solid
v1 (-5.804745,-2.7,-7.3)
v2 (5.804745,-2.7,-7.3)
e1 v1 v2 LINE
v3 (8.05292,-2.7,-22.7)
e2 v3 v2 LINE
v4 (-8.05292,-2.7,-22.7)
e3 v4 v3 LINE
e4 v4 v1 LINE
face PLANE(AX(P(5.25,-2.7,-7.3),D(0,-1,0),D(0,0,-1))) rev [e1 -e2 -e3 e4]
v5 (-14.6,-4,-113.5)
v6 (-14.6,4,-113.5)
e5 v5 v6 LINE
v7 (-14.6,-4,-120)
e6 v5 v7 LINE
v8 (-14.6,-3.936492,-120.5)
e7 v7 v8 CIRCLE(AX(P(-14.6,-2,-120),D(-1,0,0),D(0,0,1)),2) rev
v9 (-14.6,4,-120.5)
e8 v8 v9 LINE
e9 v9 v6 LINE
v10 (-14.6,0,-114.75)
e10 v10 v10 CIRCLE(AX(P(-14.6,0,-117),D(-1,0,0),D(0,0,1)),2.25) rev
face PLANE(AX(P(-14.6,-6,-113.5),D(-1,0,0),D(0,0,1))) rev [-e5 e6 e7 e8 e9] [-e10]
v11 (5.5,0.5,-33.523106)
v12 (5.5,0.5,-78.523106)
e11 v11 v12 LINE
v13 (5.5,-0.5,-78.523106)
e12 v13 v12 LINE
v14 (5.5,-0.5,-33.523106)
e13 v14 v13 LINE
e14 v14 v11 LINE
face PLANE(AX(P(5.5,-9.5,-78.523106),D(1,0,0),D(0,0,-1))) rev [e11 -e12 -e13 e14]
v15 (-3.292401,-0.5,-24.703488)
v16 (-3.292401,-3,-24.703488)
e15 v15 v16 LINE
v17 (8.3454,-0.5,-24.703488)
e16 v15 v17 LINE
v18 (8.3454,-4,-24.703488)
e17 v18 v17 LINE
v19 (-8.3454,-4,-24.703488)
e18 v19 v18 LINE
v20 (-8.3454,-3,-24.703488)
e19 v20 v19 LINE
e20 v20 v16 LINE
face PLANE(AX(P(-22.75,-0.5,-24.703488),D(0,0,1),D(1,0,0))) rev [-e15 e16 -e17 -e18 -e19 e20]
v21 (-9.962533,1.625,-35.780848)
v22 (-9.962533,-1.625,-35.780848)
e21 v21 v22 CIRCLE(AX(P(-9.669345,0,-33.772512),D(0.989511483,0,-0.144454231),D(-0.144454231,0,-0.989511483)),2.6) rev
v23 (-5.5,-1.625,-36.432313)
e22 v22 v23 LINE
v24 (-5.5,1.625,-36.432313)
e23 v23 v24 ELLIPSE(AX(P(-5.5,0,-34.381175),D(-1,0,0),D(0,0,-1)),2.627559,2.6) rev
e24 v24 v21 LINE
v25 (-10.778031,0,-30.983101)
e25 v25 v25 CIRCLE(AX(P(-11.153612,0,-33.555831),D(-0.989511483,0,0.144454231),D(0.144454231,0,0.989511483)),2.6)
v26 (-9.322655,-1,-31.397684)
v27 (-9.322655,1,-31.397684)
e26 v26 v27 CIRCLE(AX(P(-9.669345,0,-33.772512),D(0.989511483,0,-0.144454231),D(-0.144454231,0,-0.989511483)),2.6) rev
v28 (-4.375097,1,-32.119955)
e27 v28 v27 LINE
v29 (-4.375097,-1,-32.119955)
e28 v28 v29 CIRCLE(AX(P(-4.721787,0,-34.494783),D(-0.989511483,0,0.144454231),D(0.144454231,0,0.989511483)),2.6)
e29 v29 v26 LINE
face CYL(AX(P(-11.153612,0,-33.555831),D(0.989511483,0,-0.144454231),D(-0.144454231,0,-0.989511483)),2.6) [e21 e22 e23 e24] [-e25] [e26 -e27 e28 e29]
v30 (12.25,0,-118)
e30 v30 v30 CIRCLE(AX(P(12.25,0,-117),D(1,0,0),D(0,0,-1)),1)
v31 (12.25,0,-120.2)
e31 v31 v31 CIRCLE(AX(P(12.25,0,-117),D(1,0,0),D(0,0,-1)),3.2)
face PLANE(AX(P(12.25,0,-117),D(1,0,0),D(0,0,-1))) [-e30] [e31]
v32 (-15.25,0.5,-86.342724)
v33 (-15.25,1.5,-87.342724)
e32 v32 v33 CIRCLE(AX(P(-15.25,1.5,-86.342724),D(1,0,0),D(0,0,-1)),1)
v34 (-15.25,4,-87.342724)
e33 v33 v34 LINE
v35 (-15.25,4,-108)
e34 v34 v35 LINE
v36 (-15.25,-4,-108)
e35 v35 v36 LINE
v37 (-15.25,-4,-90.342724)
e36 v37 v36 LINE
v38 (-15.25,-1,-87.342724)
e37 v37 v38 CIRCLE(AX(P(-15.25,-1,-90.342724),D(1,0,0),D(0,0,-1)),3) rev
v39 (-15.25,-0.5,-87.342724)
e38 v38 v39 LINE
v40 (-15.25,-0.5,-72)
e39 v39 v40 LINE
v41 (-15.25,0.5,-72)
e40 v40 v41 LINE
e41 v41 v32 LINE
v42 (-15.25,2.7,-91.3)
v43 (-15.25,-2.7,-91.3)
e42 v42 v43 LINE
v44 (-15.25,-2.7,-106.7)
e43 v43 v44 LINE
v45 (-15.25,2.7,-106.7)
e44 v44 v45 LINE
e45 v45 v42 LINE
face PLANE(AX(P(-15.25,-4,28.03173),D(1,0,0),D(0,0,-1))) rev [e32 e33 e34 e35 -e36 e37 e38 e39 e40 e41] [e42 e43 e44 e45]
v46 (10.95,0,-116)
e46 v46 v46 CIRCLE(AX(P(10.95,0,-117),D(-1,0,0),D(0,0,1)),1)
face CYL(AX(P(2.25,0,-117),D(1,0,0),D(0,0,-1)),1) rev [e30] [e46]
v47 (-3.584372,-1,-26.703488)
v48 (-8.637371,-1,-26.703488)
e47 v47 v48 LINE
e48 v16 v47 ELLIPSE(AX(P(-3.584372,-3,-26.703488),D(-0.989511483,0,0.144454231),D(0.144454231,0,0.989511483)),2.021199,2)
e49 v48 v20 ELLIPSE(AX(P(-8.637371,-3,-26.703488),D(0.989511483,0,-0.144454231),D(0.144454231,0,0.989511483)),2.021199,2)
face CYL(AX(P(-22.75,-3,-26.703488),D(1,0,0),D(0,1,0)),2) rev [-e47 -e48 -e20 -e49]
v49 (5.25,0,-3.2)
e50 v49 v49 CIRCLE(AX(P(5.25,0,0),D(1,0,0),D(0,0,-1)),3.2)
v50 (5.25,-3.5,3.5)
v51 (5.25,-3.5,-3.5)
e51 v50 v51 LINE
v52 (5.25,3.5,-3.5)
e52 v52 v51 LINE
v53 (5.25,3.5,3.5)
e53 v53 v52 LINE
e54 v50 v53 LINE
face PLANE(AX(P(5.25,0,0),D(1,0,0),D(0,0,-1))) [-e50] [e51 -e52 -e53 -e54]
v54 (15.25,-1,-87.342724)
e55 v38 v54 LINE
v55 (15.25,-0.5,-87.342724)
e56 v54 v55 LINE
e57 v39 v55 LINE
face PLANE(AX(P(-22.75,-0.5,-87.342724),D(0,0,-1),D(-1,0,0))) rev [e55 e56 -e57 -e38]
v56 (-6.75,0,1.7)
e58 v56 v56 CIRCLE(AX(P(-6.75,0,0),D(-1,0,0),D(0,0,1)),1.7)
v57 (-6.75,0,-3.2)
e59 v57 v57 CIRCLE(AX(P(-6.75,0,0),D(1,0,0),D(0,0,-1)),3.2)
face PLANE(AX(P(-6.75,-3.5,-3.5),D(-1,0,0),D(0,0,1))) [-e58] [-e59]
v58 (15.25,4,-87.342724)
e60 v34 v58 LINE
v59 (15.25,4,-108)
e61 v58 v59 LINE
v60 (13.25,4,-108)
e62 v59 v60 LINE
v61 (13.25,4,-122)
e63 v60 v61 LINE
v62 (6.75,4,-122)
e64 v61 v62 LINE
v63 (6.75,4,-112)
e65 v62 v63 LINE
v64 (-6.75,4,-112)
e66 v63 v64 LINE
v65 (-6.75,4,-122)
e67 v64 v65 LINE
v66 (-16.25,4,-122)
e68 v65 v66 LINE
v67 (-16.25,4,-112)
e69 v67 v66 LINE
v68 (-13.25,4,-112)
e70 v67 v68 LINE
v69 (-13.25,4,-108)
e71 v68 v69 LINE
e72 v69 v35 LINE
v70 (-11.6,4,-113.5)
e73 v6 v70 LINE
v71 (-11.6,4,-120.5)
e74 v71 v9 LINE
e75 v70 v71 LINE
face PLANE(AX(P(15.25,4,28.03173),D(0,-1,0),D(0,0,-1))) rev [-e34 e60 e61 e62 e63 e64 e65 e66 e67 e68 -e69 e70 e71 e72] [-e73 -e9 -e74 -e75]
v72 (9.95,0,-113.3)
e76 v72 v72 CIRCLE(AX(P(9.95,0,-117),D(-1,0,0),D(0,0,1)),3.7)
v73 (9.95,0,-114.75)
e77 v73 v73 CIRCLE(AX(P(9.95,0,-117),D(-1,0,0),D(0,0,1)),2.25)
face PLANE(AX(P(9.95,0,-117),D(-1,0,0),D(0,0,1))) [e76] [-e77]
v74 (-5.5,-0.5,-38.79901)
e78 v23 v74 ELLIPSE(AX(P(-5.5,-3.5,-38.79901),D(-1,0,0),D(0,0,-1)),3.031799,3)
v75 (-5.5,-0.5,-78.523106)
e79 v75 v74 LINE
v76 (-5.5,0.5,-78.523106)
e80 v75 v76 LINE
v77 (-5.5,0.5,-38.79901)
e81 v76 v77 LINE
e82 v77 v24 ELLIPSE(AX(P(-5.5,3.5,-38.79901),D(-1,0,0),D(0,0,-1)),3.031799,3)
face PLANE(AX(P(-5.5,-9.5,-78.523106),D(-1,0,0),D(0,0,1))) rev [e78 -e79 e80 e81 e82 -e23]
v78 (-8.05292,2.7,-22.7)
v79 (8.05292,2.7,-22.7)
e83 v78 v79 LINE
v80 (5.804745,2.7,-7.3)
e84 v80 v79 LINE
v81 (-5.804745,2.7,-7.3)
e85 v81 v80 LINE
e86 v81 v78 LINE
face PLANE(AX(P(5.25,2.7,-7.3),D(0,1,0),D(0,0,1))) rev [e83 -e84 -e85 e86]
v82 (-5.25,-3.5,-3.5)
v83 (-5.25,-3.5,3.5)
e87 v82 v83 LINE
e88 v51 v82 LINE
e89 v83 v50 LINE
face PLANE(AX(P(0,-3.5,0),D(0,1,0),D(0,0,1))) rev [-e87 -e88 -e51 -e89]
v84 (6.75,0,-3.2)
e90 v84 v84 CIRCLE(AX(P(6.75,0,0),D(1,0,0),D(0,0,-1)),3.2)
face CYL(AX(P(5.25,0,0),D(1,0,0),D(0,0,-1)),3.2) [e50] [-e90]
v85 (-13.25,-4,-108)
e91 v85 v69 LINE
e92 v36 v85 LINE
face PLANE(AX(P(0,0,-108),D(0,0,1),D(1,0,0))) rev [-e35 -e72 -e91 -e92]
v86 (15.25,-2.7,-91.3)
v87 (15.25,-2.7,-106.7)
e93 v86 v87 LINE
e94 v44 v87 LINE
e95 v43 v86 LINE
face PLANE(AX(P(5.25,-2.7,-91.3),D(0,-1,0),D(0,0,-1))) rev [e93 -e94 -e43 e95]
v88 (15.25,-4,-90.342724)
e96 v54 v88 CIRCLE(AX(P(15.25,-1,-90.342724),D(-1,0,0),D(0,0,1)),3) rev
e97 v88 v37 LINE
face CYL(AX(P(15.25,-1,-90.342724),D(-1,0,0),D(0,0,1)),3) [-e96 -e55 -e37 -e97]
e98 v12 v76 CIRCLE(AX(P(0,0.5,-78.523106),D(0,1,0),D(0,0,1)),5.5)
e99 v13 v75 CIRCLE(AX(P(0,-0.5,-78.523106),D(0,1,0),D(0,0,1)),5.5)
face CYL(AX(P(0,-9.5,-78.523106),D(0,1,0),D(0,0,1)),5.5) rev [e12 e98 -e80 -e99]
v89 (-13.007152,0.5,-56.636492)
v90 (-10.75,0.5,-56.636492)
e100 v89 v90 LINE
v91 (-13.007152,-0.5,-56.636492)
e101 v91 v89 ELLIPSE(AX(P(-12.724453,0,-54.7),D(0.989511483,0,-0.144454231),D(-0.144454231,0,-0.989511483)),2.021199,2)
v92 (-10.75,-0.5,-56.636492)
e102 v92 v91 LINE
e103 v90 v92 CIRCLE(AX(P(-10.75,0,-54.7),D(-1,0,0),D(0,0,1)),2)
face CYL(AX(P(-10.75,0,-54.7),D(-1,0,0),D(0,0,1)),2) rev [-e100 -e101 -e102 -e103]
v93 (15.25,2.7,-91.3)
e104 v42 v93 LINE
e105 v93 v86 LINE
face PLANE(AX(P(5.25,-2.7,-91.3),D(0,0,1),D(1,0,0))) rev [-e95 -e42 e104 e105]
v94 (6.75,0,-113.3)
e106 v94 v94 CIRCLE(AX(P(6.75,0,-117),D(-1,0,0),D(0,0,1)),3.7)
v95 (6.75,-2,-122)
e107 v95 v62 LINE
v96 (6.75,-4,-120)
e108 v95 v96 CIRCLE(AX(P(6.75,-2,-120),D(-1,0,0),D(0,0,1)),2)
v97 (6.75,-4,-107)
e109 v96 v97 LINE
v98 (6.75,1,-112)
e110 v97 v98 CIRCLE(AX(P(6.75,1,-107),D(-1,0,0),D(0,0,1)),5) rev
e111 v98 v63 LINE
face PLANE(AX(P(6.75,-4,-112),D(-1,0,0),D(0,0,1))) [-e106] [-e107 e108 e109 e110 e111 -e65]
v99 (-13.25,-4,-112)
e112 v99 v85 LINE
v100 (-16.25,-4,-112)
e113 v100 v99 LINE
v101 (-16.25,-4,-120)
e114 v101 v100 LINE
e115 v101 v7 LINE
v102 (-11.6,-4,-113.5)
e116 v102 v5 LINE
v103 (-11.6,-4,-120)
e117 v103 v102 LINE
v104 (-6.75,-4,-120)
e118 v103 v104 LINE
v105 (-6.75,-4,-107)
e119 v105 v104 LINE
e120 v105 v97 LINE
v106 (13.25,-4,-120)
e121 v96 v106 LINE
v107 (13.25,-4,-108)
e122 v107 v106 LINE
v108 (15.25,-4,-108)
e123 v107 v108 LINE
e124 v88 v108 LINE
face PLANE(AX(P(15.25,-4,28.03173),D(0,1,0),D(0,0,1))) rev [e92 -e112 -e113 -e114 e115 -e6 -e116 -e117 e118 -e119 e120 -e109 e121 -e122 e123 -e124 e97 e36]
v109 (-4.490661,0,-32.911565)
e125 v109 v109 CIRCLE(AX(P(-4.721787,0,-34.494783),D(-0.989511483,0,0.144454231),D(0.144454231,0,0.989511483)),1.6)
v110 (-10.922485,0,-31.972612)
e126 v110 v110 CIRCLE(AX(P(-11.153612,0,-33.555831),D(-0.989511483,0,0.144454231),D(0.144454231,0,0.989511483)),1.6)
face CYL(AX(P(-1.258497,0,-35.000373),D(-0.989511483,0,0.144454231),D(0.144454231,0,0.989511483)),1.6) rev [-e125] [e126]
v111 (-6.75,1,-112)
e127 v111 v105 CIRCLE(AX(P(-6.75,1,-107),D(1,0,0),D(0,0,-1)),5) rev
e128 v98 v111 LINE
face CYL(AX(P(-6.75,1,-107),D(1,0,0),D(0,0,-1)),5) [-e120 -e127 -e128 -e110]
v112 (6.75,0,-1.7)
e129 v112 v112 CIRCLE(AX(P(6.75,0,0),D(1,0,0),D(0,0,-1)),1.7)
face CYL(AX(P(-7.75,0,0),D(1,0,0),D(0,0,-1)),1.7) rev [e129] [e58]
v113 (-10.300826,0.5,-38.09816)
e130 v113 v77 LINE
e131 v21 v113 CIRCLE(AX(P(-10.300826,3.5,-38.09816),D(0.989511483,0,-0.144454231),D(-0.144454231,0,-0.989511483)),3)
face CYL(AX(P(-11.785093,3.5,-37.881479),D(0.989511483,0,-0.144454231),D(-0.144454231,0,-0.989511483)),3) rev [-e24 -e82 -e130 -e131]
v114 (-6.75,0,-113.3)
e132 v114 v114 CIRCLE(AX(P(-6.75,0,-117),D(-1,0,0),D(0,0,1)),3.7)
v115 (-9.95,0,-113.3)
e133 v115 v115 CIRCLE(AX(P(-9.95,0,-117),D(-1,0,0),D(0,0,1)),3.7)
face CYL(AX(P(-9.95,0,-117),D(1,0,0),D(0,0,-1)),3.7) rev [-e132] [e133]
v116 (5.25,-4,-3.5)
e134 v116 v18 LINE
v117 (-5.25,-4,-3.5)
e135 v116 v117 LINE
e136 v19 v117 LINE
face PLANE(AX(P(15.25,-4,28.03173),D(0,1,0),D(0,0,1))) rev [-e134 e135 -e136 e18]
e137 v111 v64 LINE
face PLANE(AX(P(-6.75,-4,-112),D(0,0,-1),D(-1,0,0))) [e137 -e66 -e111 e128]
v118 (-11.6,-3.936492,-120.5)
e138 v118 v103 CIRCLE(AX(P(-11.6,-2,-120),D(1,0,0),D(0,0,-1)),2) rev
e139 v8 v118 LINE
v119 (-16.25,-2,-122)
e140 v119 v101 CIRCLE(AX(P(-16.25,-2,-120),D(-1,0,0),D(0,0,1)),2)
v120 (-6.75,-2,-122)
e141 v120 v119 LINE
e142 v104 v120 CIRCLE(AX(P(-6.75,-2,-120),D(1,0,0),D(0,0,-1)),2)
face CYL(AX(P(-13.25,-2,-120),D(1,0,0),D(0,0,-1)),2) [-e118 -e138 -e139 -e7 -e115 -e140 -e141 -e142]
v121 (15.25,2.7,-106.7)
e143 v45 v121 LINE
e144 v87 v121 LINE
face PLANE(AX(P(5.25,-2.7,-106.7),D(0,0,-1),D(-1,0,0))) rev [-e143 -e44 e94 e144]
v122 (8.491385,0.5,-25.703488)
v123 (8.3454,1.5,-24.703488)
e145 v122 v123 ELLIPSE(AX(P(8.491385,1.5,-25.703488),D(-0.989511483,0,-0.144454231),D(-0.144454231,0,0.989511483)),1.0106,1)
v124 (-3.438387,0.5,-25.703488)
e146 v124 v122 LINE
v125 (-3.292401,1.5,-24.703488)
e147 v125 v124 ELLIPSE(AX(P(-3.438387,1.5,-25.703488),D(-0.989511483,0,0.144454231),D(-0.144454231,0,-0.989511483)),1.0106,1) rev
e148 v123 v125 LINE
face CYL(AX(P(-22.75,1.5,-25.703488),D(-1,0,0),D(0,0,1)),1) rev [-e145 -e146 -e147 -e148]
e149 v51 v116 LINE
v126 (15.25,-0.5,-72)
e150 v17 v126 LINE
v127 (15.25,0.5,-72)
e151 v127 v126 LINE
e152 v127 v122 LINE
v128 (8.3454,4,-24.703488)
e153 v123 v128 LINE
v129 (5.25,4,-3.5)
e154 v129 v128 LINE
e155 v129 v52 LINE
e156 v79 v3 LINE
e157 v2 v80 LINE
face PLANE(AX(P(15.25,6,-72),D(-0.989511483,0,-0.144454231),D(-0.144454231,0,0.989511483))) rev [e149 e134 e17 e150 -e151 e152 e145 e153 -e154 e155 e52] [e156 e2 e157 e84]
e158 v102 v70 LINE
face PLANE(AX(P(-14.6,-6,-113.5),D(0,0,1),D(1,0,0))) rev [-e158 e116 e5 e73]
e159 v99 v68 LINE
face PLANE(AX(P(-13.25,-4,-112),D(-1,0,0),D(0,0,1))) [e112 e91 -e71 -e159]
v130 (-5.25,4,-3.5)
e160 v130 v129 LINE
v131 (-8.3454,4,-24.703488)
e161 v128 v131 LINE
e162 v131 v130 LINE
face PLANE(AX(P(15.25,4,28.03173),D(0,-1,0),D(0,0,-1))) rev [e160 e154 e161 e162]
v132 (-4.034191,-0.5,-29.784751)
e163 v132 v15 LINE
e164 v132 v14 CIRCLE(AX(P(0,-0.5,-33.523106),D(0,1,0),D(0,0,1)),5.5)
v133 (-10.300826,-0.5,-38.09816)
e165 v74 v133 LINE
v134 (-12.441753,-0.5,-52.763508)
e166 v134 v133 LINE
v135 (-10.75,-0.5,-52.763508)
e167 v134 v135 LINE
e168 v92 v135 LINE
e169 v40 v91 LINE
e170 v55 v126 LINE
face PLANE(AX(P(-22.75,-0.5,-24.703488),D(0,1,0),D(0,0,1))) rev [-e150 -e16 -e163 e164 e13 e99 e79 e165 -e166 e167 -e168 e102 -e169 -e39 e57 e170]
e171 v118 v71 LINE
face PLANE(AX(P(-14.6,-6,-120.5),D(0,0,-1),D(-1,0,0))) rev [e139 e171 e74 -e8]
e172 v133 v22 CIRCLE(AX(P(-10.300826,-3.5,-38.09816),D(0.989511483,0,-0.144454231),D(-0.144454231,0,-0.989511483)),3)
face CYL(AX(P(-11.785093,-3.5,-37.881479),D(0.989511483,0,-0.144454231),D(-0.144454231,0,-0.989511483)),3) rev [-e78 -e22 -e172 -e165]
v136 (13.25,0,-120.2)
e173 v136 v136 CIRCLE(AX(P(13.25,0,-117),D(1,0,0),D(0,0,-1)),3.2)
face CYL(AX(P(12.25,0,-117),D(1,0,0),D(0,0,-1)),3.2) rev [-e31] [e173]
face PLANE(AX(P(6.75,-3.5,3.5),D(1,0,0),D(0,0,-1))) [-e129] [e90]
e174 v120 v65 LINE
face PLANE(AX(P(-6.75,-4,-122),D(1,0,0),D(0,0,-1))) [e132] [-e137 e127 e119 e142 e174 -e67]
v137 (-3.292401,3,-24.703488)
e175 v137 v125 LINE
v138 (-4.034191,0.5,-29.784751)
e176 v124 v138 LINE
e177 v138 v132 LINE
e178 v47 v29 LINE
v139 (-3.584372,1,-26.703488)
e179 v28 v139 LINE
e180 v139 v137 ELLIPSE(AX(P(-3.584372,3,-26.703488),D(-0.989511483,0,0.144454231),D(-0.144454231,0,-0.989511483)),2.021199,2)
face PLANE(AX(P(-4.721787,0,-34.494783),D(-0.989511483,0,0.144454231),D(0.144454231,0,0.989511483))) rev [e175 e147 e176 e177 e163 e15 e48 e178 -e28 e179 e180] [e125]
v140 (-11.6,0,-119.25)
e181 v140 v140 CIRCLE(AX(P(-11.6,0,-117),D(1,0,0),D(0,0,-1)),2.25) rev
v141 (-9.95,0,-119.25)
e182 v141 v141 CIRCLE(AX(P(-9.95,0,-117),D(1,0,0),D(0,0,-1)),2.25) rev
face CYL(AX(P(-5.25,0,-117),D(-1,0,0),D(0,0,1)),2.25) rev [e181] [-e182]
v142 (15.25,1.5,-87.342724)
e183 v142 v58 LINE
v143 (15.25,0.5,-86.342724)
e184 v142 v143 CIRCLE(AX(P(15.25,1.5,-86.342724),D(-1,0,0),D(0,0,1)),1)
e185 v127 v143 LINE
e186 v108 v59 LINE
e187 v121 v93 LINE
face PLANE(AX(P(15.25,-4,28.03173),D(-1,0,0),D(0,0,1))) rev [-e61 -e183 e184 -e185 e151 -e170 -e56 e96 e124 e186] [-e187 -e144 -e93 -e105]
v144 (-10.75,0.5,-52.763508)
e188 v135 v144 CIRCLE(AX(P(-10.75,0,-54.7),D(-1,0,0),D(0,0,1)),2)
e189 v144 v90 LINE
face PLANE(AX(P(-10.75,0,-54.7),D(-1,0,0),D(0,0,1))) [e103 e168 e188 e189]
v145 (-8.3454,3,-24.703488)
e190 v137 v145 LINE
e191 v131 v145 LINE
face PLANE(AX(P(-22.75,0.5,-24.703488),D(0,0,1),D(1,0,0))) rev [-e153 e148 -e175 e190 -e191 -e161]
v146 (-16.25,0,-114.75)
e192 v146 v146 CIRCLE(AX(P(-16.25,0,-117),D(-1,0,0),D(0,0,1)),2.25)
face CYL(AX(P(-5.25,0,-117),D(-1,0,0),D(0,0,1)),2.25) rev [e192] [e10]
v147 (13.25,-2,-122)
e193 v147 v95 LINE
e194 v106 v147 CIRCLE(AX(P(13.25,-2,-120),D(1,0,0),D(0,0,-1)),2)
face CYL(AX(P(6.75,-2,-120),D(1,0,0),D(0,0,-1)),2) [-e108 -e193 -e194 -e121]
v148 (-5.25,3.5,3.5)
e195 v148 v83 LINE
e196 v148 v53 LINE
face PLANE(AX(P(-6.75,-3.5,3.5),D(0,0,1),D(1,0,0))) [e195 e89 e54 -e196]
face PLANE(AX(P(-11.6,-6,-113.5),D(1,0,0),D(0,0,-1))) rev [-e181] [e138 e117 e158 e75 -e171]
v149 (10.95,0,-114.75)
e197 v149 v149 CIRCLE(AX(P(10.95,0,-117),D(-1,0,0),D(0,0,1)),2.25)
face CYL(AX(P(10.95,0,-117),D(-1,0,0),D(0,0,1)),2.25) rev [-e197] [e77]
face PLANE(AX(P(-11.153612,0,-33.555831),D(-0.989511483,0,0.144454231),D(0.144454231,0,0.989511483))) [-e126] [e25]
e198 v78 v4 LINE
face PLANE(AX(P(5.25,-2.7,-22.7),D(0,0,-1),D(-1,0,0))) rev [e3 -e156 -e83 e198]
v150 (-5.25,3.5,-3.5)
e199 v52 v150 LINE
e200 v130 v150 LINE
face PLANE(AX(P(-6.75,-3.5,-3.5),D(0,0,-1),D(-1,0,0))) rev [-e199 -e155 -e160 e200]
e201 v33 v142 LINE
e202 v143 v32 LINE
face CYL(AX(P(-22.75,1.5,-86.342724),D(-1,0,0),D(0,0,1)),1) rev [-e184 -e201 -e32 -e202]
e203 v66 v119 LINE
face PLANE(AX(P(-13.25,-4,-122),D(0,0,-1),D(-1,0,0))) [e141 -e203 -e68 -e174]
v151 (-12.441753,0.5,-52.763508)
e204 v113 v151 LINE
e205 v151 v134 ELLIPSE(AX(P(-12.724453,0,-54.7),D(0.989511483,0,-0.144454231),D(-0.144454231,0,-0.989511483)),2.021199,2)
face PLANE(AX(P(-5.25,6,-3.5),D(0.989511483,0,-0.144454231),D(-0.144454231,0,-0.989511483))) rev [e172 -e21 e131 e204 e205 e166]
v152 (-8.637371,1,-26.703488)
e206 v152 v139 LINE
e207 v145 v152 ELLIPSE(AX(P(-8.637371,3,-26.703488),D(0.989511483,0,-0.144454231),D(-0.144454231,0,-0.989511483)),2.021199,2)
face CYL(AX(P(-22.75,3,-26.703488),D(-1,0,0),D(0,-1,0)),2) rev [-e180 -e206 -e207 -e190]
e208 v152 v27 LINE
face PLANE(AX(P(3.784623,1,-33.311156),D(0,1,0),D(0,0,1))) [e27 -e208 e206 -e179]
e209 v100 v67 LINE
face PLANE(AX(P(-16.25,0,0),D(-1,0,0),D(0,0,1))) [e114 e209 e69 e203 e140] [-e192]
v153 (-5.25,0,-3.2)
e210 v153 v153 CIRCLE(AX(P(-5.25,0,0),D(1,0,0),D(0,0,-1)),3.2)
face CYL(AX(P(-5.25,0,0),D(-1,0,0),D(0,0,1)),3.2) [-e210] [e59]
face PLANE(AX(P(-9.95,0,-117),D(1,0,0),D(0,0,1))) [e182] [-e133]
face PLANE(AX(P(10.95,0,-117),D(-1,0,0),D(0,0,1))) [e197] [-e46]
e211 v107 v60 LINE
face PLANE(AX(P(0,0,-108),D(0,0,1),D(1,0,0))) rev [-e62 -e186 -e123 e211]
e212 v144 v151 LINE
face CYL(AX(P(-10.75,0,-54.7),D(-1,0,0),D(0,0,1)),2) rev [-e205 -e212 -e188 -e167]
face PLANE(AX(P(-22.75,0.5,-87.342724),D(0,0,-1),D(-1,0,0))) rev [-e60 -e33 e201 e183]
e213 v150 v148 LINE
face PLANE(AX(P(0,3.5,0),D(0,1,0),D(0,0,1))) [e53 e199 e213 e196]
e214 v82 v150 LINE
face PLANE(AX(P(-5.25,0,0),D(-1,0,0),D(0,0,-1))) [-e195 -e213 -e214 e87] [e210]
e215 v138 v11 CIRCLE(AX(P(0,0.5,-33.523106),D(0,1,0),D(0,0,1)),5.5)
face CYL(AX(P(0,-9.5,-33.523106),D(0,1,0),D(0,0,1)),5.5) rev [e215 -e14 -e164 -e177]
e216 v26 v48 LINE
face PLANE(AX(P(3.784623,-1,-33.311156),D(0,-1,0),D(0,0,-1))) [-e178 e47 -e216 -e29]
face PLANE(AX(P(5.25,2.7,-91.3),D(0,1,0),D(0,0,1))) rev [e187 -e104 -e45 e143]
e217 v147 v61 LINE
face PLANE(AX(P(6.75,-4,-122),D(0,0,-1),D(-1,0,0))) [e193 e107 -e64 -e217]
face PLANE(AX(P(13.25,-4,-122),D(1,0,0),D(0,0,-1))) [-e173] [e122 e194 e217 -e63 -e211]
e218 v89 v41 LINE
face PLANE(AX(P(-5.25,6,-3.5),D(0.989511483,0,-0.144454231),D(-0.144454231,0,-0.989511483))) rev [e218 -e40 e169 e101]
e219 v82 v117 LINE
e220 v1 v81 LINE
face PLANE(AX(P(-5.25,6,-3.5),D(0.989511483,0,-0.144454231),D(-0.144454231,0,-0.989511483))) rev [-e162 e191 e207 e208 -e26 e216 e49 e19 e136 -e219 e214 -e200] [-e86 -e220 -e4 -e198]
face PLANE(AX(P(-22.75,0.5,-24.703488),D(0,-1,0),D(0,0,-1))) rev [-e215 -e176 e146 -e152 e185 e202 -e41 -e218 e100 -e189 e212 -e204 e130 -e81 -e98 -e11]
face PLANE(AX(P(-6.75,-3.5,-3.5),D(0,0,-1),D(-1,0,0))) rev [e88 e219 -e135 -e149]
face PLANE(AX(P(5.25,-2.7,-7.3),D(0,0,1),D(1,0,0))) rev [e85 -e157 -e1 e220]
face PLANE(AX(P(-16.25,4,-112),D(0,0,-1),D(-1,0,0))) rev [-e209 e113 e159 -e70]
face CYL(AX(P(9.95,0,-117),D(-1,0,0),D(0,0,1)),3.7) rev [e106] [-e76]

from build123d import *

# Parameters (mm, degrees)
JOINTTIBIA_DEPTH           = 3.5
JOINTTIBIA_DEPTH_BACK      = 3.5
ESQUISSE2_W                = 13.5
ESQUISSE2_H                = 7
ESQUISSE3_R                = 1.7
HOLEAXETIBIA_DEPTH         = 14.5
ESQUISSE4_R                = 5.505678288
ESQUISSE4_R_2              = 3.2
ENTRETOISETIBIA_DEPTH      = 1.5
SHAPEJOINTCOXA_DEPTH       = 4
SHAPEJOINTCOXA_DEPTH_BACK  = 4
ESQUISSE6_R                = 3.2
HOLEMAGNET_DEPTH           = 1
ESQUISSE7_R                = 2.25
HOLEAXE_DEPTH              = 8
ESQUISSE9_R                = 3.7
HOLEBEARING_DEPTH          = 3.2
ESQUISSE10_R               = 2.25
ENTRETOISEBEARING_DEPTH    = 1
ESQUISSE12_W               = 10
ESQUISSE12_H               = 8
ESQUISSE12_R               = 2.25
EXTSCREWLESS_DEPTH         = 3
ESQUISSE13_W               = 3
ESQUISSE13_H               = 7
SCEWLESSLOCKER_DEPTH       = 10
ESQUISSE24_W               = 30.5
ESQUISSE24_H               = 8
SHAPE_BDY_DEPTH            = 104.5
TRIANGULIZE_DEPTH          = 10
ESQUISSE27_W               = 15.4
ESQUISSE27_H               = 5.4
ATTACHWINGS_DEPTH          = 10
ESQUISSE29_W               = 62.63923601
ESQUISSE29_H               = 9.700813627
VOID_BODY_DEPTH            = 38
MASS_REMOVER_PCB_DEPTH     = 10
CONG_1_R                   = 5
CONG_2_R                   = 3
ESQUISSE32_W               = 15.4
ESQUISSE32_H               = 5.4
LOCKERHOLE_DEPTH           = 32
FIXATIONSENSOR_DEPTH       = 1.5
FIXATIONSENSOR_DEPTH_BACK  = 5
ESQUISSE33_R               = 2.6
ESQUISSE34_R               = 1.6
SCREWFIXATIONSENSOR_DEPTH  = 10
ESQUISSE35_W               = 8
ESQUISSE35_H               = 2
FIXATIONSENSORRENFOR_DEPTH = 5
CONG_3_R                   = 3
CONG_4_R                   = 2
CONG_5_R                   = 2
CONG_6_R                   = 1
ESQUISSE36_R               = 2
ENL_V_MAT_EXTRU_1_DEPTH    = 4.5
ESQUISSE38_R               = 1
REMOVER_HELPER_DEPTH       = 10


with BuildPart() as part:
    # Esquisse2 → JointTibia (new, two sides: drawn at the far end of the back side and taken through both)
    with BuildSketch(Plane(origin=(0, 0, 0), x_dir=(1, 0, 0), z_dir=(0, 1, 0)).offset(-JOINTTIBIA_DEPTH_BACK)):
        Rectangle(ESQUISSE2_W, ESQUISSE2_H)
    extrude(amount=JOINTTIBIA_DEPTH + JOINTTIBIA_DEPTH_BACK)

    # Esquisse3 → HoleAxeTibia (cut)
    with BuildSketch(Plane(origin=(6.75, 0, 0), x_dir=(0, 0, -1), z_dir=(1, 0, 0))):
        Circle(ESQUISSE3_R)
    extrude(amount=-HOLEAXETIBIA_DEPTH, mode=Mode.SUBTRACT)

    # Esquisse4 → EntretoiseTibia (cut)
    with BuildSketch(Plane(origin=(6.75, 0, 0), x_dir=(0, 0, -1), z_dir=(1, 0, 0))):
        Circle(ESQUISSE4_R)
        Circle(ESQUISSE4_R_2, mode=Mode.SUBTRACT)
    entretoisetibia = extrude(amount=-ENTRETOISETIBIA_DEPTH, mode=Mode.SUBTRACT)

    # Symétrie1: EntretoiseTibia across plane
    add(entretoisetibia.mirror(Plane(origin=(0, 0, 0), x_dir=(0, 0, 1), z_dir=(1, 0, 0))), mode=Mode.SUBTRACT)



with BuildPart() as body_2:
    # Esquisse5 → ShapeJointCoxa (new, two sides: drawn at the far end of the back side and taken through both)
    with BuildSketch(Plane(origin=(0, 0, 0), x_dir=(1, 0, 0), z_dir=(0, 1, 0)).offset(-SHAPEJOINTCOXA_DEPTH_BACK)):
        Polygon((-13.25, 112), (-13.25, 122), (-6.75, 122), (-6.75, 112), (6.75, 112), (6.75, 122), (13.25, 122), (13.25, 112), (13.25, 108), (-13.25, 108), align=None)
    extrude(amount=SHAPEJOINTCOXA_DEPTH + SHAPEJOINTCOXA_DEPTH_BACK)

    # Esquisse6 → HoleMagnet (cut)
    with BuildSketch(Plane(origin=(13.25, 0, 0), x_dir=(0, 0, -1), z_dir=(1, 0, 0))):
        with Locations((117, 0)):
            Circle(ESQUISSE6_R)
    extrude(amount=-HOLEMAGNET_DEPTH, mode=Mode.SUBTRACT)

    # Esquisse7 → HoleAxe (cut)
    with BuildSketch(Plane.ZY.offset(13.25)):
        with Locations((-117, 0)):
            Circle(ESQUISSE7_R)
    extrude(amount=-HOLEAXE_DEPTH, mode=Mode.SUBTRACT)

    # Esquisse9 → HoleBearing (cut)
    with BuildSketch(Plane.ZY.offset(-6.75)):
        with Locations((-117, 0)):
            Circle(ESQUISSE9_R)
    holebearing = extrude(amount=-HOLEBEARING_DEPTH, mode=Mode.SUBTRACT)

    # Symétrie2: HoleBearing across plane
    add(holebearing.mirror(Plane(origin=(0, 0, 0), x_dir=(0, 0, 1), z_dir=(1, 0, 0))), mode=Mode.SUBTRACT)

    # Esquisse10 → EntretoiseBearing (cut)
    with BuildSketch(Plane.ZY.offset(-9.95)):
        with Locations((-117, 0)):
            Circle(ESQUISSE10_R)
    extrude(amount=-ENTRETOISEBEARING_DEPTH, mode=Mode.SUBTRACT)

    # Esquisse12 → ExtScrewLess (add)
    with BuildSketch(Plane.ZY.offset(13.25)):
        with Locations((-117, 0)):
            Rectangle(ESQUISSE12_W, ESQUISSE12_H)
        with Locations((-117, 0)):
            Circle(ESQUISSE12_R, mode=Mode.SUBTRACT)
    extrude(amount=EXTSCREWLESS_DEPTH)

    # Esquisse13 → ScewLessLocker (cut)
    with BuildSketch(Plane(origin=(0, 4, 0), x_dir=(1, 0, 0), z_dir=(0, 1, 0))):
        with Locations((-13.1, 117)):
            Rectangle(ESQUISSE13_W, ESQUISSE13_H)
    extrude(amount=-SCEWLESSLOCKER_DEPTH, mode=Mode.SUBTRACT)


with BuildPart() as part_1:
    add(part.part)

    add(body_2.part)  # Shape_bdy merges body 2
    # Esquisse24 → Shape_bdy (add)
    with BuildSketch(Plane.XY.offset(-108)):
        Rectangle(ESQUISSE24_W, ESQUISSE24_H)
    extrude(amount=SHAPE_BDY_DEPTH)

    # Esquisse26 → Triangulize (cut)
    with BuildSketch(Plane.XZ.offset(4)):
        Polygon((-5.25, -3.5), (-15.25, -72), (-15.25, -3.5), align=None)
        Polygon((5.25, -3.5), (15.25, -3.5), (15.25, -72), align=None)
    extrude(amount=-TRIANGULIZE_DEPTH, mode=Mode.SUBTRACT)

    # Esquisse27 → AttachWings (cut)
    with BuildSketch(Plane(origin=(15.25, 0, 0), x_dir=(0, 0, -1), z_dir=(1, 0, 0))):
        with Locations((99, 0)):
            Rectangle(ESQUISSE27_W, ESQUISSE27_H)
        with Locations((15, 0)):
            Rectangle(ESQUISSE27_W, ESQUISSE27_H)
    attachwings = extrude(amount=-ATTACHWINGS_DEPTH, mode=Mode.SUBTRACT)

    # Symétrie4: AttachWings across plane
    add(attachwings.mirror(Plane(origin=(0, 0, 0), x_dir=(0, 0, 1), z_dir=(1, 0, 0))), mode=Mode.SUBTRACT)

    # Esquisse29 → Void body (cut)
    with BuildSketch(Plane(origin=(15.25, 0, 0), x_dir=(0, 0, -1), z_dir=(1, 0, 0))):
        with Locations((56.023105982, 5.350406814)):
            Rectangle(ESQUISSE29_W, ESQUISSE29_H)
        with Locations((56.023105982, -5.350406814)):
            Rectangle(ESQUISSE29_W, ESQUISSE29_H)
    extrude(amount=-VOID_BODY_DEPTH, mode=Mode.SUBTRACT)

    # Esquisse30 → Mass remover & PCB (cut)
    with BuildSketch(Plane(origin=(0, 0.5, 0), x_dir=(1, 0, 0), z_dir=(0, 1, 0))):
        with BuildLine():
            Line((5.5, 78.523105982), (5.5, 33.523105982))
            ThreePointArc((5.5, 33.523105982), (0, 28.023105982), (-5.5, 33.523105982))
            Line((-5.5, 33.523105982), (-5.5, 78.523105982))
            ThreePointArc((-5.5, 78.523105982), (0, 84.023105982), (5.5, 78.523105982))
        make_face()
    extrude(amount=-MASS_REMOVER_PCB_DEPTH, mode=Mode.SUBTRACT)

    # Congé1
    cong_1_edges = [part_1.edges().sort_by_distance(p)[0] for p in [
        (0, -4, -112),
    ]]
    fillet(cong_1_edges, radius=CONG_1_R)

    # Congé2
    cong_2_edges = [part_1.edges().sort_by_distance(p)[0] for p in [
        (0, -4, -87.342723987),
    ]]
    fillet(cong_2_edges, radius=CONG_2_R)

    # Esquisse32 → LockerHole (cut)
    with BuildSketch(Plane(origin=(5.25, 0, 0), x_dir=(0, 0, -1), z_dir=(1, 0, 0))):
        with Locations((99, 0)):
            Rectangle(ESQUISSE32_W, ESQUISSE32_H)
        with Locations((15, 0)):
            Rectangle(ESQUISSE32_W, ESQUISSE32_H)
    extrude(amount=-LOCKERHOLE_DEPTH, mode=Mode.SUBTRACT)

    # Esquisse33 → FixationSensor (add, two sides: drawn at the far end of the back side and taken through both)
    with BuildSketch(Plane(origin=(-4.640161198, 0, 0.677395795), x_dir=(0.14445423110427463, 0, 0.989511483064281), z_dir=(-0.989511483064281, 0, 0.14445423110427463)).offset(-FIXATIONSENSOR_DEPTH_BACK)):
        with Locations((-34.81506606, 0)):
            Circle(ESQUISSE33_R)
    extrude(amount=FIXATIONSENSOR_DEPTH + FIXATIONSENSOR_DEPTH_BACK)

    # Esquisse34 → ScrewFixationSensor (cut)
    with BuildSketch(Plane(origin=(-6.124428422, 0, 0.894077142), x_dir=(0.14445423110427466, 0, 0.989511483064281), z_dir=(-0.989511483064281, 0, 0.14445423110427466))):
        with Locations((-34.81506606, 0)):
            Circle(ESQUISSE34_R)
    extrude(amount=-SCREWFIXATIONSENSOR_DEPTH, mode=Mode.SUBTRACT)

    # Esquisse35 → FixationSensorRenfor (add)
    with BuildSketch(Plane(origin=(-4.640161198, 0, 0.677395795), x_dir=(0.14445423110427463, 0, 0.989511483064281), z_dir=(-0.989511483064281, 0, 0.14445423110427463))):
        with Locations((-28.41506606, 0)):
            Rectangle(ESQUISSE35_W, ESQUISSE35_H)
    extrude(amount=-FIXATIONSENSORRENFOR_DEPTH)

    # Congé3
    cong_3_edges = [part_1.edges().sort_by_distance(p)[0] for p in [
        (-7.768957729, 0.5, -36.628455586),
        (-7.768957729, -0.5, -36.628455586),
    ]]
    fillet(cong_3_edges, radius=CONG_3_R)

    # Congé4
    # the kernel refuses this fillet: 2 mm, written as the material it takes off along each edge
    with BuildSketch(Plane(origin=(1.75, -4, -122), x_dir=(0, 0, 1), z_dir=(1, 0, 0))) as cong_4_piece_1:
        with BuildLine():
            CenterArc((CONG_4_R, -CONG_4_R), CONG_4_R, 90, 90)
            Line((0, -CONG_4_R), (0, 0))
            Line((0, 0), (CONG_4_R, 0))
        make_face()
    extrude(amount=16.5, mode=Mode.SUBTRACT)
    with BuildSketch(Plane(origin=(-21.25, -4, -122), x_dir=(0, 0, 1), z_dir=(1, 0, 0))) as cong_4_piece_2:
        with BuildLine():
            CenterArc((CONG_4_R, -CONG_4_R), CONG_4_R, 90, 90)
            Line((0, -CONG_4_R), (0, 0))
            Line((0, 0), (CONG_4_R, 0))
        make_face()
    extrude(amount=19.5, mode=Mode.SUBTRACT)

    # Congé5
    cong_5_edges = [part_1.edges().sort_by_distance(p)[0] for p in [
        (-5.818900475, 1, -24.703487977),
        (-5.818900475, -1, -24.703487977),
    ]]
    fillet(cong_5_edges, radius=CONG_5_R)

    # Congé6
    cong_6_edges = [part_1.edges().sort_by_distance(p)[0] for p in [
        (0, 0.5, -87.342723987),
        (2.52649923, 0.5, -24.703487977),
    ]]
    fillet(cong_6_edges, radius=CONG_6_R)

    # Esquisse36 → Enlèv. mat.-Extru.1 (cut)
    with BuildSketch(Plane.ZY.offset(15.25)):
        with Locations((-54.7, 0)):
            Circle(ESQUISSE36_R)
    extrude(amount=-ENL_V_MAT_EXTRU_1_DEPTH, mode=Mode.SUBTRACT)

    # Esquisse38 → Remover helper (cut)
    with BuildSketch(Plane(origin=(12.25, 0, 0), x_dir=(0, 0, -1), z_dir=(1, 0, 0))):
        with Locations((117, 0)):
            Circle(ESQUISSE38_R)
    extrude(amount=-REMOVER_HELPER_DEPTH, mode=Mode.SUBTRACT)


solid = part_1.part
